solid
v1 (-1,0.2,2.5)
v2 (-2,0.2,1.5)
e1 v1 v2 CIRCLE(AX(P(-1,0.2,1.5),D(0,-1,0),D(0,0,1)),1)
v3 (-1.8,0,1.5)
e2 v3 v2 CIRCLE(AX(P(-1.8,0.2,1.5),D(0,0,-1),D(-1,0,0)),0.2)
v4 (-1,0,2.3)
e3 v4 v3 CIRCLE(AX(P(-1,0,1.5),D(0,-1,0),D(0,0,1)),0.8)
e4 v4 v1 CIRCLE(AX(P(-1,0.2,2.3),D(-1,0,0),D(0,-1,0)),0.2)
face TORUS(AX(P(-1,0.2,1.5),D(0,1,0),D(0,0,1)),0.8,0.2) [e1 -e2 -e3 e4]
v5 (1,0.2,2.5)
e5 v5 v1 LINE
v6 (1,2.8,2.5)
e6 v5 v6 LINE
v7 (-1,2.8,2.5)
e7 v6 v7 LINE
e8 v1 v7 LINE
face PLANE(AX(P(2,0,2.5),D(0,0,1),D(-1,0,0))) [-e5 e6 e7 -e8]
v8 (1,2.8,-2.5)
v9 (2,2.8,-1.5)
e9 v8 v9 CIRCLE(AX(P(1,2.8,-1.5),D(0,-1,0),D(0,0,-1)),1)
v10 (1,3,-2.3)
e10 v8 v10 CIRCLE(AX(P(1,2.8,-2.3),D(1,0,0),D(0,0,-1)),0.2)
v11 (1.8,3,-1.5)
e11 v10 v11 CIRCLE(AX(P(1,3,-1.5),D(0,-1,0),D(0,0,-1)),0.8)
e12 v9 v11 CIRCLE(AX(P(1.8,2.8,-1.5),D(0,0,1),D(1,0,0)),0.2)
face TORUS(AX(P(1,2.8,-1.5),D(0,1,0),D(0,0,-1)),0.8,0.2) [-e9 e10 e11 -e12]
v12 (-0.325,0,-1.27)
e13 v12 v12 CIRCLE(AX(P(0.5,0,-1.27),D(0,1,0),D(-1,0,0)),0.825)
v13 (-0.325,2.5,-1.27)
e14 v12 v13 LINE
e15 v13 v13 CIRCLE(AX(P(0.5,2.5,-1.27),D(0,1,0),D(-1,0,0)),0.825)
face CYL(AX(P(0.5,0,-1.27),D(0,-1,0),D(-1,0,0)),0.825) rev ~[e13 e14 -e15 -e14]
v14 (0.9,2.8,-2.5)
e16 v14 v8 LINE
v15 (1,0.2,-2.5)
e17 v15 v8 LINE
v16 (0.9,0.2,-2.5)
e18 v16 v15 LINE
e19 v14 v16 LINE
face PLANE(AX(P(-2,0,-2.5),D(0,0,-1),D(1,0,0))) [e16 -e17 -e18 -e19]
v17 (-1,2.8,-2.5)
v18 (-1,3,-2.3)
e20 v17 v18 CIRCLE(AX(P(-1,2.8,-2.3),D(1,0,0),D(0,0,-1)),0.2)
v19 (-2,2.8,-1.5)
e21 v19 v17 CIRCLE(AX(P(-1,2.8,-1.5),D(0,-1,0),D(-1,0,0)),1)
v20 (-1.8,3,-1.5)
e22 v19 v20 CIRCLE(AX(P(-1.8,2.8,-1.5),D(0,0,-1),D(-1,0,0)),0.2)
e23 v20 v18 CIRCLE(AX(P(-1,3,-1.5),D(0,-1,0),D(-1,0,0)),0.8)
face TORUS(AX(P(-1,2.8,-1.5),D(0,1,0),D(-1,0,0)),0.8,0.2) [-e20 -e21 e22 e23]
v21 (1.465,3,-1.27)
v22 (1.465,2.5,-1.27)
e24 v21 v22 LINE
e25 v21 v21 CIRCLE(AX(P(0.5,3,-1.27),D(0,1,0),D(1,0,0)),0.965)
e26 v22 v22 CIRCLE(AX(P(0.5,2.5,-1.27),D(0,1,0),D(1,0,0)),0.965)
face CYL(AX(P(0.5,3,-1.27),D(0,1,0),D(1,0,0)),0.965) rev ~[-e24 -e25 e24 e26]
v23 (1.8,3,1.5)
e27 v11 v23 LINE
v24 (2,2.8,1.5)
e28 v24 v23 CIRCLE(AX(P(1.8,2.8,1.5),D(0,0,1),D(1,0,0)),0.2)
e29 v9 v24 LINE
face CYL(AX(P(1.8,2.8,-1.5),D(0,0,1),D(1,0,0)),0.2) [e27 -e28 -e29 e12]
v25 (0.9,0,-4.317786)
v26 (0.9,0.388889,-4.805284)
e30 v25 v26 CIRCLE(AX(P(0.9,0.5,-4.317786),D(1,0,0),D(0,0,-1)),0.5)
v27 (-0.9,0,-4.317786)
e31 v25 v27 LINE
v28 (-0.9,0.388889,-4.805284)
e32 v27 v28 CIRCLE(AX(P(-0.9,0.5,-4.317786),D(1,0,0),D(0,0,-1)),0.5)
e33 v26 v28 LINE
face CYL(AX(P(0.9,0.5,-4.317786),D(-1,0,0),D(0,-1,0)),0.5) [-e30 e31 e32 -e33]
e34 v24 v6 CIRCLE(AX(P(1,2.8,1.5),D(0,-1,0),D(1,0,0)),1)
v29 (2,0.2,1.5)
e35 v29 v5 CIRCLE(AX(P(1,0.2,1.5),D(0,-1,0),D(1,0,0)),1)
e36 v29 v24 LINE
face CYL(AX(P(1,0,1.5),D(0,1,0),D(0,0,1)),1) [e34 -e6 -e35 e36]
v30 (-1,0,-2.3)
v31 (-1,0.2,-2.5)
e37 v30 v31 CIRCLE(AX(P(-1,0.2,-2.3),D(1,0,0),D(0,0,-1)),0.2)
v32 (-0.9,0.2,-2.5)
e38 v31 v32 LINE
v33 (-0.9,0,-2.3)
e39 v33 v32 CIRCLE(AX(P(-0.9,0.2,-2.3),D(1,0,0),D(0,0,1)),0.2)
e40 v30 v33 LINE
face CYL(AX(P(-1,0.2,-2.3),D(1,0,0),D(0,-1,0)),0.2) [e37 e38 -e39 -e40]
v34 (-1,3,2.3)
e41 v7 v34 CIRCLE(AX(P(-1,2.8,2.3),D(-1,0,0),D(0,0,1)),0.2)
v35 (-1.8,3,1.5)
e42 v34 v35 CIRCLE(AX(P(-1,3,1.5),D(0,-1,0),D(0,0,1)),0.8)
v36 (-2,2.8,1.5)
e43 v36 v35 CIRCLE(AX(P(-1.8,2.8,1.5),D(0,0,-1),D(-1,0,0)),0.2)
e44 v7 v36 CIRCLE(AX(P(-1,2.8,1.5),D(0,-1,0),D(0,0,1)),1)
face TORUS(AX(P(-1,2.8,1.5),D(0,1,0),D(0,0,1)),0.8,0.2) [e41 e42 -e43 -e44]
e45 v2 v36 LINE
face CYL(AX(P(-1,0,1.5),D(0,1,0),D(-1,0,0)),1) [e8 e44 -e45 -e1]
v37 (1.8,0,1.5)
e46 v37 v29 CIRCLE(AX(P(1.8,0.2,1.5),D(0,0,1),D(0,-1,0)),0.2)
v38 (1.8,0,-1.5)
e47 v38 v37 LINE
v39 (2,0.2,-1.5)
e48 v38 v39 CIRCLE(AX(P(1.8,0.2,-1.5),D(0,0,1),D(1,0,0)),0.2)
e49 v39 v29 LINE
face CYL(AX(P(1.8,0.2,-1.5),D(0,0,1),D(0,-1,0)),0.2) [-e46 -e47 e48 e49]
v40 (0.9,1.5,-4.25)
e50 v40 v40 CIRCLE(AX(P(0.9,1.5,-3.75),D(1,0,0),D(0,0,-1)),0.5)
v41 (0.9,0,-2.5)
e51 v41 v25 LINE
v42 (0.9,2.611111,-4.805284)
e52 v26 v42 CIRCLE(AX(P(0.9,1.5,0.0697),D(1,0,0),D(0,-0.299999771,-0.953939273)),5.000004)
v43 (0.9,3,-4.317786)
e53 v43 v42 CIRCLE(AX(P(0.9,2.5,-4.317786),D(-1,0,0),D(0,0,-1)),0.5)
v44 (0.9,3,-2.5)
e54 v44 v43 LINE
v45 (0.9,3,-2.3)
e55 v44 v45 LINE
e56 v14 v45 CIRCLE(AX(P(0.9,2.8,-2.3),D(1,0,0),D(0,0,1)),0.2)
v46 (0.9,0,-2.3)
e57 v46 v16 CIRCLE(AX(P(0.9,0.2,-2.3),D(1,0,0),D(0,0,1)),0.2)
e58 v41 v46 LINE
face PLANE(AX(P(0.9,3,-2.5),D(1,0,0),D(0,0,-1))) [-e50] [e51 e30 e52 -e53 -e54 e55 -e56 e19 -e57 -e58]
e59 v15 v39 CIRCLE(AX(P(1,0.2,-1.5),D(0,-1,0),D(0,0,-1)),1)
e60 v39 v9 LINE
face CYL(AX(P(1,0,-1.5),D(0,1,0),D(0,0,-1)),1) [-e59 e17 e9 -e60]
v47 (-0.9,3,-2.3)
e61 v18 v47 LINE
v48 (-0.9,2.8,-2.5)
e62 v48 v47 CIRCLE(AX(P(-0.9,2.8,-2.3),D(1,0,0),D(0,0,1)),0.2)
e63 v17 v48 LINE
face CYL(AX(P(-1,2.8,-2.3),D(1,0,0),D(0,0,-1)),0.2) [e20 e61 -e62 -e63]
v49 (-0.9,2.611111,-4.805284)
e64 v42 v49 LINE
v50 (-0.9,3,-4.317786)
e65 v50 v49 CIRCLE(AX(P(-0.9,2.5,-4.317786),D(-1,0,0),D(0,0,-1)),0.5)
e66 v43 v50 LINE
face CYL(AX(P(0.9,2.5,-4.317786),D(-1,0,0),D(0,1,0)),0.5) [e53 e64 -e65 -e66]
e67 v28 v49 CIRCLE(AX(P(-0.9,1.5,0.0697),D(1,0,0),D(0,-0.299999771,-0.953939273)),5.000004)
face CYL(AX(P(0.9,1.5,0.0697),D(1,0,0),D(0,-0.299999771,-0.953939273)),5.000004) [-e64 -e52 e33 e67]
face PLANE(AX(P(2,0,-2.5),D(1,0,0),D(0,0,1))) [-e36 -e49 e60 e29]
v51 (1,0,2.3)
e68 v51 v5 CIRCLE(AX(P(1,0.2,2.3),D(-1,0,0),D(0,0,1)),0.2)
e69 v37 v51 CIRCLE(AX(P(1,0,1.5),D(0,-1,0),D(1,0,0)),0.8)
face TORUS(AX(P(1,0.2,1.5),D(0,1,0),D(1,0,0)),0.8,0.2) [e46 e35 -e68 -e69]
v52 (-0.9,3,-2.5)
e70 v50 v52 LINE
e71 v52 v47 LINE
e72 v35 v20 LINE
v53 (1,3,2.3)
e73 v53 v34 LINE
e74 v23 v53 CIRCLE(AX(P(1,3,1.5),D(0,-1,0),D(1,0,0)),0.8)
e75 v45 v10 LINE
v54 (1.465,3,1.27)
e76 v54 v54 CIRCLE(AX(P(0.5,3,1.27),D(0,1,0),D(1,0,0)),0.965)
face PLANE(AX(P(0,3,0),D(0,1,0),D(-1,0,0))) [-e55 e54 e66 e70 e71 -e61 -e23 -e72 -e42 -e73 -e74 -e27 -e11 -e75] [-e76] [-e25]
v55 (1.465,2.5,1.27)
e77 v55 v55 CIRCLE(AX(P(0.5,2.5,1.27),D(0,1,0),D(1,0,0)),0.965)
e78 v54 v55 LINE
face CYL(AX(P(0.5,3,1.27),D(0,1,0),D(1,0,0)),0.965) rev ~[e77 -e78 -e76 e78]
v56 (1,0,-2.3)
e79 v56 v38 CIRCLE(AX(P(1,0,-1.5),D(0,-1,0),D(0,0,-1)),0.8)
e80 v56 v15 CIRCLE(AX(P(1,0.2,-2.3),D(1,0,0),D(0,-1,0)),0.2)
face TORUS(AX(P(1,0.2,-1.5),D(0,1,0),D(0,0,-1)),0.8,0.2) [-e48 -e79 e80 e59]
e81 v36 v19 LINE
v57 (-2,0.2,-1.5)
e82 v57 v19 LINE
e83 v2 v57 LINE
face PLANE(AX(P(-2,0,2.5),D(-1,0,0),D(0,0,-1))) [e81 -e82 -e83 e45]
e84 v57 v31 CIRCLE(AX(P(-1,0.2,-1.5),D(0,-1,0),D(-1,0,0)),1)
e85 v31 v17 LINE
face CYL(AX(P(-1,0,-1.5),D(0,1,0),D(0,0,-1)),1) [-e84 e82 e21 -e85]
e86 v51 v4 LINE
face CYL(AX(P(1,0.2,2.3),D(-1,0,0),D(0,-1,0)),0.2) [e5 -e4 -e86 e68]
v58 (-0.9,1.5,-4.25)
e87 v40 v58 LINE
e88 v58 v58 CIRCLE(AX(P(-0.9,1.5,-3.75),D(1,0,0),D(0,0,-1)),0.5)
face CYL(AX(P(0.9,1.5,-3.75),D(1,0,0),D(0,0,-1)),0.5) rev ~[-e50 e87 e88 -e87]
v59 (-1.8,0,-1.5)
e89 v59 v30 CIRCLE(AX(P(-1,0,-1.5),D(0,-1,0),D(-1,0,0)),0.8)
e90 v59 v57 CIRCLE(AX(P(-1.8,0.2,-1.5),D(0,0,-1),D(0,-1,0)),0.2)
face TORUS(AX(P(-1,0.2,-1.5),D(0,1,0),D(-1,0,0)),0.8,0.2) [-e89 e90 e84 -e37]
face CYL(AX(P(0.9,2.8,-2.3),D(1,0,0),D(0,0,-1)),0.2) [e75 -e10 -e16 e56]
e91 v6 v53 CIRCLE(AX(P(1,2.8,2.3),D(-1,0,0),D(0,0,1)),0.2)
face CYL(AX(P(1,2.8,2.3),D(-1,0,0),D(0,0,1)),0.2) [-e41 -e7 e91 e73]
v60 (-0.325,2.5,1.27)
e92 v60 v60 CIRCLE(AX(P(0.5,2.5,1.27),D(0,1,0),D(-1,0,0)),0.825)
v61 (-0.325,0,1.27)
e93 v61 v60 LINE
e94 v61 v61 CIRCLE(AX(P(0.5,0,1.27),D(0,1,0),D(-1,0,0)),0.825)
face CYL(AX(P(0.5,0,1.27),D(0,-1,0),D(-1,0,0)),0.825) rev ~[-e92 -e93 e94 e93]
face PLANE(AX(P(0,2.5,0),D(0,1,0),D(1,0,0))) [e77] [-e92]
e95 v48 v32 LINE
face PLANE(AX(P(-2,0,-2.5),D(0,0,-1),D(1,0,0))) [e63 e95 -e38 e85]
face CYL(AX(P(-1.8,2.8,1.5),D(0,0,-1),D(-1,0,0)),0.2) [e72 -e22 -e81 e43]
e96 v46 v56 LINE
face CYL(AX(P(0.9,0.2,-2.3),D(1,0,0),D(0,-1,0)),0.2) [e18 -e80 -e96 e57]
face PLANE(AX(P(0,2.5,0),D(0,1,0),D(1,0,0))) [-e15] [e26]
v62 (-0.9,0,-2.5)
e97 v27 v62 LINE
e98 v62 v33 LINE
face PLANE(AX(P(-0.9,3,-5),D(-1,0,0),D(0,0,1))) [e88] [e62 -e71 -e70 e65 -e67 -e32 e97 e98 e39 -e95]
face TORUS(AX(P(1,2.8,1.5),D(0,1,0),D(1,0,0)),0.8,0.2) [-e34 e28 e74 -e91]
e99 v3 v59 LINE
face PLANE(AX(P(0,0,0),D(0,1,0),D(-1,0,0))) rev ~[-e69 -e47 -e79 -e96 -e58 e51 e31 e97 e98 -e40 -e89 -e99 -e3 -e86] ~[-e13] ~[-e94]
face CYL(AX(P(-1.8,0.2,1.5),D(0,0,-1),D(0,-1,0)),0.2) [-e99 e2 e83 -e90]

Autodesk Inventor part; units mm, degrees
ref_plane "YZ Plane" through (0, 0, 0) normal (1, 0, 0) x (0, 1, 0)
ref_plane "XZ Plane" through (0, 0, 0) normal (0, 1, 0) x (-1, 0, 0)
ref_plane "XY Plane" through (0, 0, 0) normal (0, 0, 1) x (1, 0, 0)
sketch "Sketch1" plane through (0, 0, 0) normal (0, 1, 0) x (-1, 0, 0)
  line L0 (-2, 2.5) -> (2, 2.5)
  line L1 (2, 2.5) -> (2, -2.5)
  line L2 (2, -2.5) -> (-2, -2.5)
  line L3 (-2, -2.5) -> (-2, 2.5)
  line L4 (-2, 2.5) -> (2, -2.5) construction
  line L5 (2, 2.5) -> (-2, -2.5) construction
  line L6 (0, 0) -> (2, 0) construction
  circle A0 centre (-0.5, 1.27) radius 0.825
  line L7 (-0.5, 1.27) -> (-0.5, 0) construction
  circle A1 centre (-0.5, -1.27) radius 0.825
  line L8 (-0.5, -1.27) -> (-0.5, 0) construction
  dimension "d0" = 4
  dimension "d1" = 5
  dimension "d3" = 1.65
  dimension "d4" = 1.27
  dimension "d5" = 1.5
extrude "Extrusion1" add sketch "Sketch1" along normal blind 3
sketch "Sketch2" plane through (0, 3, 0) normal (0, 1, 0) x (1, 0, 0)
  circle A0 centre (0.5, -1.27) radius 0.825 projected
  circle A1 centre (0.5, -1.27) radius 0.965
  circle A2 centre (0.5, 1.27) radius 0.825 projected
  circle A3 centre (0.5, 1.27) radius 0.965
  point P0 (0, 0)
  dimension "d8" = 1.93
  dimension "d9" = 1.93
extrude "Extrusion2" cut sketch "Sketch2" against normal blind 0.5
sketch "Sketch3" plane through (0, 3, 0) normal (0, 1, 0) x (1, 0, 0)
  line L0 (2, 2.5) -> (-2, 2.5) projected
  line L1 (-0.9, 2.5) -> (0.9, 2.5)
  line L2 (0.9, 2.5) -> (0.9, 5)
  line L3 (0.9, 5) -> (-0.9, 5)
  line L4 (-0.9, 5) -> (-0.9, 2.5)
  line L5 (-2, -2.5) -> (2, -2.5) projected
  line L6 (0, -2.5) -> (0, 2.5) construction
  point P0 (0, 0)
  dimension "d12" = 2.5
  dimension "d13" = 1.8
extrude "Extrusion3" add sketch "Sketch3" against normal up to surface (3 mm away)
sketch "Sketch4" plane through (0.9, 3, -2.5) normal (1, 0, 0) x (0, 0, -1)
  line L0 (2.2, 0) -> (2.2, -3) construction
  arc A0 (2.2, -3) -> (2.2, 0) centre (-2.5697, -1.5) ccw
  line L1 (2.5, 0) -> (2.5, -3) projected
  line L2 (2.2, 0) -> (2.5, 0)
  line L3 (2.5, 0) -> (2.5, -3)
  line L4 (2.5, -3) -> (2.2, -3)
  line L5 (2.5, -1.5) -> (1.25, -1.5) construction
  circle A1 centre (1.25, -1.5) radius 0.5
  point P0 (-2.5, -3)
  dimension "d16" = 5
  dimension "d17" = 0.3
  dimension "d18" = 1
  dimension "d19" = 1.25
extrude "Extrusion4" cut sketch "Sketch4" against normal blind 10
fillet "Fillet1" radius 0.5 2 edges at (0, 3, -4.7) (0, 0, -4.7)
fillet "Fillet2" radius 1 4 edges at (2, 1.5, -2.5) (2, 1.5, 2.5) (-2, 1.5, -2.5) (-2, 1.5, 2.5)
fillet "Fillet3" radius 0.2 18 edges at (2, 3, 0) (1.7071, 3, -2.2071) (0.95, 3, -2.5) (1.7071, 3, 2.2071) (0, 3, 2.5) (-1.7071, 3, 2.2071) (-2, 3, 0) (-1.7071, 3, -2.2071) (-0.95, 3, -2.5) (1.7071, 0, -2.2071) (0.95, 0, -2.5) (1.7071, 0, 2.2071) (0, 0, 2.5) (-1.7071, 0, 2.2071) (-2, 0, 0) (-1.7071, 0, -2.2071) (-0.95, 0, -2.5) (2, 0, 0)
equation "\"d9\" = d8"
properties part number "Camera_holder_PCB_1DOF"
